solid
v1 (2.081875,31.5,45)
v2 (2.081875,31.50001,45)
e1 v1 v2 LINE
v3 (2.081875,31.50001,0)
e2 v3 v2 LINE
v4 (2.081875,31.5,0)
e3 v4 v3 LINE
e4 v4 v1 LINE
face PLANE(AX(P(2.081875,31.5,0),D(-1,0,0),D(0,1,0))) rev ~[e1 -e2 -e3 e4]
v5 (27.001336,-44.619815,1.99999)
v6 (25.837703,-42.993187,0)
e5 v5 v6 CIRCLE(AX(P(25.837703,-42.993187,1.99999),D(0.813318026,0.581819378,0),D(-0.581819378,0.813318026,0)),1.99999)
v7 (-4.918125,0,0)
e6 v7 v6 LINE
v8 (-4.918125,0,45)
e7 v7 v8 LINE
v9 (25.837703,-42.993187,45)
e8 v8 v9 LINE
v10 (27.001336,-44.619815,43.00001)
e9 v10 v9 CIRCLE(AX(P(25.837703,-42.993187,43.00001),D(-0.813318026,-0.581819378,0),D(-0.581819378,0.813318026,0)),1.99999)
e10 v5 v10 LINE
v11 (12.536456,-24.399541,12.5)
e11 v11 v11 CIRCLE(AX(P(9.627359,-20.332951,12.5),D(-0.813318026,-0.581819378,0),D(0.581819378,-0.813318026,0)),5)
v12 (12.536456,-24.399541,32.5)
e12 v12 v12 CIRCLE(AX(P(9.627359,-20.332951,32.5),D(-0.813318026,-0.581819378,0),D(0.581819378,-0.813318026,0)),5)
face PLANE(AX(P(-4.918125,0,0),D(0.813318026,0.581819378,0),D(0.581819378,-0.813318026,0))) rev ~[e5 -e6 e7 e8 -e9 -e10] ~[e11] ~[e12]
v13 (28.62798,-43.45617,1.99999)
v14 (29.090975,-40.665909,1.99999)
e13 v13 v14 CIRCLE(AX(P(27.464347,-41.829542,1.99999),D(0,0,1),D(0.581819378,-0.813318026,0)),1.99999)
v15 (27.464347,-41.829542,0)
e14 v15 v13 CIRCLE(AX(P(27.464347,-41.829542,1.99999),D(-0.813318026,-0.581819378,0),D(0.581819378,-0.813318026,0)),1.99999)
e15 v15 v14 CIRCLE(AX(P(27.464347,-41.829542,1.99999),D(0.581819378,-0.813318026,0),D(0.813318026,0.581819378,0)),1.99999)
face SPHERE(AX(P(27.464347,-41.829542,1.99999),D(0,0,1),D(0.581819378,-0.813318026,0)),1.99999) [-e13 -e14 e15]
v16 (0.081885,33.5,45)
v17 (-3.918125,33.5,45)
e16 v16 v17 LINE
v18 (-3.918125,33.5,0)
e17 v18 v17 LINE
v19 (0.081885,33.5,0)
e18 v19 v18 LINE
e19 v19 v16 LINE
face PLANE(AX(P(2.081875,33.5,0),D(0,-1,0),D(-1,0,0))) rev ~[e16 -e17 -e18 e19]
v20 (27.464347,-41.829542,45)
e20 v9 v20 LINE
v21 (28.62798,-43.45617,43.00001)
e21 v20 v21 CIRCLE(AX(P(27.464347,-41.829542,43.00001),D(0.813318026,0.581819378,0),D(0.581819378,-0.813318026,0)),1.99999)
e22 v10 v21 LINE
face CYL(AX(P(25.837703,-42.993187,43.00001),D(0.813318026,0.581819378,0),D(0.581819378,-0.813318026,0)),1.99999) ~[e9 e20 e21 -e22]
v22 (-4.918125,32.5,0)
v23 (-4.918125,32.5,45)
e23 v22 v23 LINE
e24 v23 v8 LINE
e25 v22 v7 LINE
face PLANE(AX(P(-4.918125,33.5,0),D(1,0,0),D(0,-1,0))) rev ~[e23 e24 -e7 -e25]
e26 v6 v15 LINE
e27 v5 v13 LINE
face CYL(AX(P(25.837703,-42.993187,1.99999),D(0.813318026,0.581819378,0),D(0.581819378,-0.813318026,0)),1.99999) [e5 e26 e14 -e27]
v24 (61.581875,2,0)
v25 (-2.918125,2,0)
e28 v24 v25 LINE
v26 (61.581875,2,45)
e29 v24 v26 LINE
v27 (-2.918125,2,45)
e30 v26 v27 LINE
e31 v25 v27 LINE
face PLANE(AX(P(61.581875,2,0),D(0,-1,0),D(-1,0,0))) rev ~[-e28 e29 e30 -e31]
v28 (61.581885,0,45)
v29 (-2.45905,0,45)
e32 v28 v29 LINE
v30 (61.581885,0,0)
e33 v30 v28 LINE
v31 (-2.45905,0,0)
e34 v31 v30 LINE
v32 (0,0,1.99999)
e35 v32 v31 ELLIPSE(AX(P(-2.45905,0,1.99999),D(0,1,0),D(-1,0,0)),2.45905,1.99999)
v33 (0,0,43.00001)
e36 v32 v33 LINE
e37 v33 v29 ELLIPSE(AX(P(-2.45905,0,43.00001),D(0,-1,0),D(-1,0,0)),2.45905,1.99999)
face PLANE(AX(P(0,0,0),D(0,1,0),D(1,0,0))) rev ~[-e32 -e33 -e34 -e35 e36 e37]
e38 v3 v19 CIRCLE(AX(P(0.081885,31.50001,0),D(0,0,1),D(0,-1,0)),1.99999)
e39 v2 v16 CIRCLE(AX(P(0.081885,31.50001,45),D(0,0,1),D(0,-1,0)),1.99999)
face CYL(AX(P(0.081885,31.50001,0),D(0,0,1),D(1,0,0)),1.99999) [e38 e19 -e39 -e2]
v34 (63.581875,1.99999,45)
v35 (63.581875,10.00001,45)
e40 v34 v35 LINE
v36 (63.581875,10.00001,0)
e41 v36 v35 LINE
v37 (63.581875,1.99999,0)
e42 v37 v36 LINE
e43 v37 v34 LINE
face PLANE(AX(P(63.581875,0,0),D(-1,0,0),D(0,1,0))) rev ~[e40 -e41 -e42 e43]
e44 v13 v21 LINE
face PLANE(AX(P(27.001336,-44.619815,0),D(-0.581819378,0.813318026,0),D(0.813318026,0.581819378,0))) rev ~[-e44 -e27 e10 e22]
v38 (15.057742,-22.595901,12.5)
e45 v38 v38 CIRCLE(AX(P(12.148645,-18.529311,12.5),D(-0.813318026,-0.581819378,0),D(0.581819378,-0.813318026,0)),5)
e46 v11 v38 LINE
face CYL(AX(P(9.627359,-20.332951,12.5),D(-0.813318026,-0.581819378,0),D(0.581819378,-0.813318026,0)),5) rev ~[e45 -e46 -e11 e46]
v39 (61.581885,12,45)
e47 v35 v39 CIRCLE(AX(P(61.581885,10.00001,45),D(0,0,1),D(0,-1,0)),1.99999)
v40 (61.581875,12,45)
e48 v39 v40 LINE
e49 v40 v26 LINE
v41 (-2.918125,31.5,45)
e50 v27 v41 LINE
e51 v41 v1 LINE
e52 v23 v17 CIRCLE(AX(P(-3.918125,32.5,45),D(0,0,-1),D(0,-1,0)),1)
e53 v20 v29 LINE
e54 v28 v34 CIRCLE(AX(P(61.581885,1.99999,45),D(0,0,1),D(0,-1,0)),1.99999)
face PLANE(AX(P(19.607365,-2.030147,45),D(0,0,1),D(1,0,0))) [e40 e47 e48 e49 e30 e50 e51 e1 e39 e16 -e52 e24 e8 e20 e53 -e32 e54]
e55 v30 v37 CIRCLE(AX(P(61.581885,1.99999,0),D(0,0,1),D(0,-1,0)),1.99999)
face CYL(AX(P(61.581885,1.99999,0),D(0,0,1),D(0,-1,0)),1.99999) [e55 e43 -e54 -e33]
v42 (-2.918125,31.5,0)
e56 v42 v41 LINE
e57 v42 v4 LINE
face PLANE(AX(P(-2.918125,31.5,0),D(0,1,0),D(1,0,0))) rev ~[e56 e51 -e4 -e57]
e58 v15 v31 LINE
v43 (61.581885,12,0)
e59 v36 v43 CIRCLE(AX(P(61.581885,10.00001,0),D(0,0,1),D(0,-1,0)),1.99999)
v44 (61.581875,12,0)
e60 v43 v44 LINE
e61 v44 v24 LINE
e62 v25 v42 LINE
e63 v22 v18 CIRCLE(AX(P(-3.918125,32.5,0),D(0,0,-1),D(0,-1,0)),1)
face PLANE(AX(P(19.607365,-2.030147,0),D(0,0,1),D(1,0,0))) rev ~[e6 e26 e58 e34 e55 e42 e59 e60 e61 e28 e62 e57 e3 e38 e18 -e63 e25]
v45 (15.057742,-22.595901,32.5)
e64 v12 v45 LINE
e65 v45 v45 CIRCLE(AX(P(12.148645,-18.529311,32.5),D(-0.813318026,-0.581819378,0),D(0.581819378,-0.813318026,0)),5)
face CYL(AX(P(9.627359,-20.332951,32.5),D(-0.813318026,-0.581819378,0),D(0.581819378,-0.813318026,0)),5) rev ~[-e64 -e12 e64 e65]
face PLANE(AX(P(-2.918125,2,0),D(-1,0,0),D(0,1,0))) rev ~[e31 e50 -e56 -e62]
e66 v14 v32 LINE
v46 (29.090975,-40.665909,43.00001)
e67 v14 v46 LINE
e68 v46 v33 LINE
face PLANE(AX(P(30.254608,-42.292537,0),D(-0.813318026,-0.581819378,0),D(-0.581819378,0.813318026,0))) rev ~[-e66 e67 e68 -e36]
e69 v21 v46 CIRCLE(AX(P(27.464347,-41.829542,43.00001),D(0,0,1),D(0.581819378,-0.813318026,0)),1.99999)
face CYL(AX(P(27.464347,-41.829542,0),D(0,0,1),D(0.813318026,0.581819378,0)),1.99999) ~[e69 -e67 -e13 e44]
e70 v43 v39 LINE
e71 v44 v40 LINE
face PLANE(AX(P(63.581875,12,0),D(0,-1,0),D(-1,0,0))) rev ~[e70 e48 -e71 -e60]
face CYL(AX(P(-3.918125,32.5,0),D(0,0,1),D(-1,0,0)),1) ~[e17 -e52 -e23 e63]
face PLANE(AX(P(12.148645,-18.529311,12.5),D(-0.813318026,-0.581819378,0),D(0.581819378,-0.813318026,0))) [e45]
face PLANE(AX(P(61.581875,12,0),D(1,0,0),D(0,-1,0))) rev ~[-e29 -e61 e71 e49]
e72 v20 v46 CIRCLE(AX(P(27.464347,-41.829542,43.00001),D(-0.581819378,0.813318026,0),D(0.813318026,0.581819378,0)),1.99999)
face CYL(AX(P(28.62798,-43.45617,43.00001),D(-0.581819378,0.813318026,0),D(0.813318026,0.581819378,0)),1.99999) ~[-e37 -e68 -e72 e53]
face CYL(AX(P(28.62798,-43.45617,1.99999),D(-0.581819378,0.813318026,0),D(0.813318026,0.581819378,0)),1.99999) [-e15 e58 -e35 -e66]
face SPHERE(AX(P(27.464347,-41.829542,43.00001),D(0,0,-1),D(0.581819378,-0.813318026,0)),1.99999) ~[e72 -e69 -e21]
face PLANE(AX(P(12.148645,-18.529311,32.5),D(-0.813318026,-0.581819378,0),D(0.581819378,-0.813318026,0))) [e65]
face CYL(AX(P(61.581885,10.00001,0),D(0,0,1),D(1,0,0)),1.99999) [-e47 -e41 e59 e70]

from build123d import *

# Parameters (mm, degrees)
F1_DEPTH = 45
F2_R     = 1.99999
F4_R     = 1
F3_R     = 5
F5_DEPTH = 3.1


# Not quite as in the source:
# - a fillet or chamfer is up to 0.001 mm smaller than in the source, because OpenCascade refuses the exact size
# - a feature names something its author has since deleted; it is built from what else it names


with BuildPart() as f1:
    # F0 (on Top) → F1 (new body)
    with BuildSketch(Plane.XY):
        Polygon((30.2546076554, -42.2925373514), (0, 0), (63.5818746515, 0), (63.5818746515, 12), (61.5818746515, 12), (61.5818746515, 2), (-2.9181253485, 2), (-2.9181253485, 31.5), (2.0818746515, 31.5), (2.0818746515, 33.5), (-4.9181253485, 33.5), (-4.9181253485, 31.5), (-4.9181253485, 0), (27.0013355514, -44.6198148634), align=None)
    extrude(amount=F1_DEPTH)

    # F2 (radius 2 in the source; OpenCascade refuses exactly that, so slightly less here)
    f2_edges = [f1.edges().sort_by_distance(p)[0] for p in [
        (63.581875, 0, 22.5),
        (63.581875, 12, 22.5),
        (30.254608, -42.292537, 22.5),
        (28.627972, -43.456176, 45),
        (28.627972, -43.456176, 0),
        (15.127304, -21.146269, 45),
        (15.127304, -21.146269, 0),
        (2.081875, 33.5, 22.5),
    ]]
    fillet(f2_edges, radius=F2_R)

    # F4
    f4_edges = [f1.edges().sort_by_distance(p)[0] for p in [
        (-4.918125, 33.5, 22.5),
    ]]
    fillet(f4_edges, radius=F4_R)

    # F3 (on face) → F5 (cut)
    with BuildSketch(Plane(origin=(-3.253272104, -2.327277512, 0), x_dir=(0.581819378, -0.813318026, 0), z_dir=(-0.813318026, -0.581819378, 0))):
        with Locations((22.1385393689, 12.5)):
            Circle(F3_R)
        with Locations((22.1385393689, 32.5)):
            Circle(F3_R)
    extrude(amount=-F5_DEPTH, mode=Mode.SUBTRACT)


solid = f1.part
